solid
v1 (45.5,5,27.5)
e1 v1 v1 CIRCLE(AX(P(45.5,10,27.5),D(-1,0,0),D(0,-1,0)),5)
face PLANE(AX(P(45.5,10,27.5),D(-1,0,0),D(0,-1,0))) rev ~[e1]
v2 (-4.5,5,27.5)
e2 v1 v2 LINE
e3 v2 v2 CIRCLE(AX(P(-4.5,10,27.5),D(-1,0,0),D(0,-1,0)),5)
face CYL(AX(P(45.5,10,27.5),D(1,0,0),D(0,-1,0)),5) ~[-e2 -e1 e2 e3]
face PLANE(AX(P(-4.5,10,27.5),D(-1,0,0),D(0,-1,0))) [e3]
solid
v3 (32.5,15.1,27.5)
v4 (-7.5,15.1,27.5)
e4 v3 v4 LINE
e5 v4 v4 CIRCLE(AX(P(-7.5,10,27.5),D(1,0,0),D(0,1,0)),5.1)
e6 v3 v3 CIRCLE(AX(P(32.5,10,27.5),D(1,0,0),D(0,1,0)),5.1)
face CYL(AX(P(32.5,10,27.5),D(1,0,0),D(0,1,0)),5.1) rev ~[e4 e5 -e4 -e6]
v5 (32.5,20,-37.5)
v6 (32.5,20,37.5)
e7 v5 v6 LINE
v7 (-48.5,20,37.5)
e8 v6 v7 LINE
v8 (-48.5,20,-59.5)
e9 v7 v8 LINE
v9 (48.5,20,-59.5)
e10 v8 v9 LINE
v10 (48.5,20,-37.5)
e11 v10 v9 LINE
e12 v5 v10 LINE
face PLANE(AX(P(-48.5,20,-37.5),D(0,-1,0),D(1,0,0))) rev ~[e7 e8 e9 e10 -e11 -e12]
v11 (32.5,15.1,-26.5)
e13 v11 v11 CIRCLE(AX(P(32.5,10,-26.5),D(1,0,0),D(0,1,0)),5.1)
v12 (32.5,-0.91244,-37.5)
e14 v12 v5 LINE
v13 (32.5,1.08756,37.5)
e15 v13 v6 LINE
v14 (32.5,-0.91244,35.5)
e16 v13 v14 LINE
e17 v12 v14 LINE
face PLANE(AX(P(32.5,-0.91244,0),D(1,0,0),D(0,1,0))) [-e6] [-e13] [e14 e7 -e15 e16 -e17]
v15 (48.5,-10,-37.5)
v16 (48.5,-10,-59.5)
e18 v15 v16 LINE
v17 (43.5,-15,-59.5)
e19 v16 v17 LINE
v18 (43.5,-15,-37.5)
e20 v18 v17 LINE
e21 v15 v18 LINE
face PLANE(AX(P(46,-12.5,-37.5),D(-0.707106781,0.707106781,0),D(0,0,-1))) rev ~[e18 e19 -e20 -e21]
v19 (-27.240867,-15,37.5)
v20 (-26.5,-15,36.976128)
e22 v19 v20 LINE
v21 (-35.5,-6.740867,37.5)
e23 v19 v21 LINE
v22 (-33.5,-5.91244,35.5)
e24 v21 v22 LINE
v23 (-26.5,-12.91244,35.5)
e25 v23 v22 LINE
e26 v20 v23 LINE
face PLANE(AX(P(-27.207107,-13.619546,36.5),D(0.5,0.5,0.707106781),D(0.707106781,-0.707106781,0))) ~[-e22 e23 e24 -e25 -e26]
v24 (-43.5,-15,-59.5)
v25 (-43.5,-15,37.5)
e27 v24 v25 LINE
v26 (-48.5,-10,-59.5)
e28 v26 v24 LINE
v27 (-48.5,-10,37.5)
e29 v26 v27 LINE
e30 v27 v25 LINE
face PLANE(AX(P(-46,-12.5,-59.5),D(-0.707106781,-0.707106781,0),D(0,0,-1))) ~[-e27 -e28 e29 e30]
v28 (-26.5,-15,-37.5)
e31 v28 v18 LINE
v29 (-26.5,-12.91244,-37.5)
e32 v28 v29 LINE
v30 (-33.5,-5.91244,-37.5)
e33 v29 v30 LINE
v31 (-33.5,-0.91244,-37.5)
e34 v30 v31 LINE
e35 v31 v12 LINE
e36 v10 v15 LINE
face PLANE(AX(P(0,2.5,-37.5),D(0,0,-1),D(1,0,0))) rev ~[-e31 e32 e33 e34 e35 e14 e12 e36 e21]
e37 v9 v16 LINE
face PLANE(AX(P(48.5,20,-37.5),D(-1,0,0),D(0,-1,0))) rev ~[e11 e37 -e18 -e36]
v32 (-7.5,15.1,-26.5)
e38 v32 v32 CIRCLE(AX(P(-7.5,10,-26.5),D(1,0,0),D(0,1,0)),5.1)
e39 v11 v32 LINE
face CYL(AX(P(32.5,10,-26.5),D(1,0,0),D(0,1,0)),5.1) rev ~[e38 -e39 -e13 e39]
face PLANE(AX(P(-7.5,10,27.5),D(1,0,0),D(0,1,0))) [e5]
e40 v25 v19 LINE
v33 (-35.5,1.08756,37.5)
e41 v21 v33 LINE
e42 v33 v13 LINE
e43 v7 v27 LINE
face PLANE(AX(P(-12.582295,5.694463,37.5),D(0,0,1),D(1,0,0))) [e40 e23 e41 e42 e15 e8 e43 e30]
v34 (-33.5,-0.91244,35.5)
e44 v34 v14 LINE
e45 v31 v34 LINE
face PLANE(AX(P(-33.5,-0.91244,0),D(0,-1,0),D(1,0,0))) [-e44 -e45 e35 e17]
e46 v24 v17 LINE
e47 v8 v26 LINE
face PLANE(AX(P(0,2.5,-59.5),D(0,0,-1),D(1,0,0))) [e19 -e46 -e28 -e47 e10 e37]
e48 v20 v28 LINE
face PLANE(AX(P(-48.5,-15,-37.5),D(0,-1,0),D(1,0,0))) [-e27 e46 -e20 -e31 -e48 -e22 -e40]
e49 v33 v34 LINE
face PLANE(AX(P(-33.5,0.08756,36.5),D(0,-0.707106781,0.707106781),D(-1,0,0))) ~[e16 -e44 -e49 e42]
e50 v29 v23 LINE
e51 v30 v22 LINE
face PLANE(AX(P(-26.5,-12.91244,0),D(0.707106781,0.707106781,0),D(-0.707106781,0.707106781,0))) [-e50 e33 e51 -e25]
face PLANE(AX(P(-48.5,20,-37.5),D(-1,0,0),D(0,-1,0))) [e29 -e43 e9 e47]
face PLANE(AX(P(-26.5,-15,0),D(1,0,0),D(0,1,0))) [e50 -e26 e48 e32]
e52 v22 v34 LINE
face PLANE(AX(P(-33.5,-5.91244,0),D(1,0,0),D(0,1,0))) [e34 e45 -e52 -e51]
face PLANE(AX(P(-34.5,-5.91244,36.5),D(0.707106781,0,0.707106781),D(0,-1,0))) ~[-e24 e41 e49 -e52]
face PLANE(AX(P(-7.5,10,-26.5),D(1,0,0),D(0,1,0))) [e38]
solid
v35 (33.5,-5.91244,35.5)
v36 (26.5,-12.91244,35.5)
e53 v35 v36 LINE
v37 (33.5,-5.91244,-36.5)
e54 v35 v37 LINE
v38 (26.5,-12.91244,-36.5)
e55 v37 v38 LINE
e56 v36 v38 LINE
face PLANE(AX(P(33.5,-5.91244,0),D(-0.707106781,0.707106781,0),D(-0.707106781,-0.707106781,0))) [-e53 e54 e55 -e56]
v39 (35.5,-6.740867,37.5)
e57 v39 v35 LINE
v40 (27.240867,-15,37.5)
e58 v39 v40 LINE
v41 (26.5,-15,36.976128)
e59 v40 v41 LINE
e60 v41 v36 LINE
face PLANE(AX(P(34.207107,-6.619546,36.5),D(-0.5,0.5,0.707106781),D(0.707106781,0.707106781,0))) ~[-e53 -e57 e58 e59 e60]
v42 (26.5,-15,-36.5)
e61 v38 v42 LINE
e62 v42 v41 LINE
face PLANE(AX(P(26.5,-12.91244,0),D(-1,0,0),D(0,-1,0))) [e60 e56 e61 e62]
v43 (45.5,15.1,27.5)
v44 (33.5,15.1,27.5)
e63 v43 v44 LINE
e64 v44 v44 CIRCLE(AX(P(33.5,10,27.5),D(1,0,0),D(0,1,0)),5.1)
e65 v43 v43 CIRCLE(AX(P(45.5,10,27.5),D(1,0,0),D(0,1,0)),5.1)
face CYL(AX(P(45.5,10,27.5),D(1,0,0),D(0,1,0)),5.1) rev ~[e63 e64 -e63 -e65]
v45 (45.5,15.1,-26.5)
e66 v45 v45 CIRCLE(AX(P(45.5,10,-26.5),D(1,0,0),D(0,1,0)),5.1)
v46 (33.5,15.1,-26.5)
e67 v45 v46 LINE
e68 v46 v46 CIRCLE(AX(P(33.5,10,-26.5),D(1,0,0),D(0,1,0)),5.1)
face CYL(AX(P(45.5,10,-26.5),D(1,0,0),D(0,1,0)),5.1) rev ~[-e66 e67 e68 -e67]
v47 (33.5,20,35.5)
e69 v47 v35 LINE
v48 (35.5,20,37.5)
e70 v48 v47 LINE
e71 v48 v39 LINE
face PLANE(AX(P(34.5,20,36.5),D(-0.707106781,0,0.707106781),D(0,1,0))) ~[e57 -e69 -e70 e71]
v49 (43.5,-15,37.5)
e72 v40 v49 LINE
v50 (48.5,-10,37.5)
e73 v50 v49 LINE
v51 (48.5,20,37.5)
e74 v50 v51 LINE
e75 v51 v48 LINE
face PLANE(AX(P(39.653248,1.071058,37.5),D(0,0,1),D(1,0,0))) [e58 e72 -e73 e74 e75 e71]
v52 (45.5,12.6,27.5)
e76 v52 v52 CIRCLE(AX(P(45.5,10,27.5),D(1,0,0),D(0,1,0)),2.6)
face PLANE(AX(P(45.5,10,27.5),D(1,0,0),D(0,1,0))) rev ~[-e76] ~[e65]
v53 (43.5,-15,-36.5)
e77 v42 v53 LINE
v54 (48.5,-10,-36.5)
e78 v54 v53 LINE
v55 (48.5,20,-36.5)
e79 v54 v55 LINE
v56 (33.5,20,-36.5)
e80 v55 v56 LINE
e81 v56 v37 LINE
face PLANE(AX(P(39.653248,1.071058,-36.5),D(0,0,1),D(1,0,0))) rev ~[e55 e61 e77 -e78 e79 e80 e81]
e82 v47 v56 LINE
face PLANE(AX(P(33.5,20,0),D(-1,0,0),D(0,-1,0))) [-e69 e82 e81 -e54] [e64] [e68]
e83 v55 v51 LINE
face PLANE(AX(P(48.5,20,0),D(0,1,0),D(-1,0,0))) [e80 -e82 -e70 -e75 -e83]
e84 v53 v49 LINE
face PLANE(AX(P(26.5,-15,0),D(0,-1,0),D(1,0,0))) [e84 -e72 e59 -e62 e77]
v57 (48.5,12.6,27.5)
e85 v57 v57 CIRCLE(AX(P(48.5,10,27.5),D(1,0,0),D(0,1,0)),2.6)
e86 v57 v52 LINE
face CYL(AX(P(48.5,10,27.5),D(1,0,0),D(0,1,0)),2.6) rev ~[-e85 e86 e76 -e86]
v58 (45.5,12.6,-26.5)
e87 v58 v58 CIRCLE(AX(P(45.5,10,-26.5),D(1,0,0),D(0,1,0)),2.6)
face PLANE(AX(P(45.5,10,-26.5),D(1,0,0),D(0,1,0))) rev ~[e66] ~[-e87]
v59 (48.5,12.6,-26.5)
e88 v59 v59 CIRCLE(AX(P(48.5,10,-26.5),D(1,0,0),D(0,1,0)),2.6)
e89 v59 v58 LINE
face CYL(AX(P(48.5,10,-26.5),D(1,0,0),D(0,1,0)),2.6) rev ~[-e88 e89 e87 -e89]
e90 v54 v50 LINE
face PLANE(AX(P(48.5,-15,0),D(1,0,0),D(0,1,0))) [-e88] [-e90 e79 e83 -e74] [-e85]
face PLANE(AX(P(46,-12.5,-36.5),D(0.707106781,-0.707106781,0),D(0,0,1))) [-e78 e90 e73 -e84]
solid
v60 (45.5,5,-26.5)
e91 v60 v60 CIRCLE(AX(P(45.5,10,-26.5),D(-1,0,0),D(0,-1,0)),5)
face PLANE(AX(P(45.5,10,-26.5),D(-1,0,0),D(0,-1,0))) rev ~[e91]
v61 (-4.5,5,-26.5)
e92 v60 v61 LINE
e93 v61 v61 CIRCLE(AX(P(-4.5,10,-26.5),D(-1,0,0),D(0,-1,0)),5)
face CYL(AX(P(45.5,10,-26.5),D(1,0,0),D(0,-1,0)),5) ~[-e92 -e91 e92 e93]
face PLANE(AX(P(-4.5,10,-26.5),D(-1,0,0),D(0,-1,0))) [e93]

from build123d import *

# Parameters (mm, degrees)
F1_DEPTH      = 37.5
F2_DEPTH      = 37.5
F2_DEPTH_BACK = 36.5
F3_W          = 97
F3_H          = 35
F4_DEPTH      = 22
F5_SIZE       = 5
F5_2_SIZE     = 5
F7_START      = -3
F6_R          = 5.1
F7_DEPTH      = 12
F8_R          = 2.6
F9_DEPTH      = 3
F10_R         = 5.1
F11_DEPTH     = 40
F12_R         = 5
F13_DEPTH     = 50
F14_SIZE      = 2
F14_2_SIZE    = 2


# Not quite as in the source:
# - a feature names something its author has since deleted; it is built from what else it names


with BuildPart() as f1:
    # F0 (on Top) → F1 (new body, symmetric)
    with BuildSketch(Plane.XY):
        Polygon((-26.5, -15), (-26.5, -12.9124395503), (-33.5, -5.9124395503), (-33.5, -0.9124395503), (32.5, -0.9124395503), (32.5, 20), (-48.5, 20), (-48.5, -15), align=None)
    extrude(amount=F1_DEPTH, both=True)

    # F3 (on face) → F4 (join)
    with BuildSketch(Plane(origin=(0, 0, -37.5), x_dir=(1, 0, 0), z_dir=(0, 0, -1))):
        with Locations((0, -2.5)):
            Rectangle(F3_W, F3_H)
    extrude(amount=F4_DEPTH)

    # F5
    f5_edges = [f1.edges().sort_by_distance(p)[0] for p in [
        (-48.5, -15, -11),
        (48.5, -15, -48.5),
    ]]
    chamfer(f5_edges, length=F5_SIZE)

    # F10 (on face) → F11 (cut)
    with BuildSketch(Plane.YZ.offset(32.5)):
        with Locations((10, 27.5)):
            Circle(F10_R)
        with Locations((10, -26.5)):
            Circle(F10_R)
    extrude(amount=-F11_DEPTH, mode=Mode.SUBTRACT)

    # F14
    f14_edges = [f1.edges().sort_by_distance(p)[0] for p in [
        (-0.5, -0.91244, 37.5),
        (-33.5, -3.41244, 37.5),
        (-30, -9.41244, 37.5),
    ]]
    chamfer(f14_edges, length=F14_SIZE)


with BuildPart() as f2:
    # F0 (on Top) → F2 (new body, two sides)
    with BuildSketch(Plane.XY) as f2_sk:
        Polygon((26.5, -12.9124395503), (26.5, -15), (48.5, -15), (48.5, 20), (33.5, 20), (33.5, -5.9124395503), align=None)
    extrude(amount=F2_DEPTH)
    extrude(f2_sk.sketch, amount=-F2_DEPTH_BACK)

    # F5#2
    f5_2_edges = [f2.edges().sort_by_distance(p)[0] for p in [
        (48.5, -15, 0.5),
    ]]
    chamfer(f5_2_edges, length=F5_2_SIZE)

    # F6 (on face) → F7 (cut)
    with BuildSketch(Plane.YZ.offset(48.5).offset(F7_START)):
        with Locations((10, 27.5)):
            Circle(F6_R)
        with Locations((10, -26.5)):
            Circle(F6_R)
    extrude(amount=-F7_DEPTH, mode=Mode.SUBTRACT)

    # F8 (on face) → F9 (cut)
    with BuildSketch(Plane.YZ.offset(48.5)):
        with Locations((10, 27.5)):
            Circle(F8_R)
        with Locations((10, -26.5)):
            Circle(F8_R)
    extrude(amount=-F9_DEPTH, mode=Mode.SUBTRACT)

    # F14#2
    f14_2_edges = [f2.edges().sort_by_distance(p)[0] for p in [
        (30, -9.41244, 37.5),
        (33.5, 7.04378, 37.5),
    ]]
    chamfer(f14_2_edges, length=F14_2_SIZE)


with BuildPart() as f13:
    # F12 (on face) → F13 (new body)
    with BuildSketch(Plane(origin=(45.5, 0, 0), x_dir=(0, -1, 0), z_dir=(-1, 0, 0))):
        with Locations((-10, 27.5)):
            Circle(F12_R)
    extrude(amount=F13_DEPTH)


with BuildPart() as f13b:
    # F12 (on face) → F13, piece 2 (new body)
    with BuildSketch(Plane(origin=(45.5, 0, 0), x_dir=(0, -1, 0), z_dir=(-1, 0, 0))):
        with Locations((-10, -26.5)):
            Circle(F12_R)
    extrude(amount=F13_DEPTH)


solid = Compound([f1.part, f2.part, f13.part, f13b.part])
